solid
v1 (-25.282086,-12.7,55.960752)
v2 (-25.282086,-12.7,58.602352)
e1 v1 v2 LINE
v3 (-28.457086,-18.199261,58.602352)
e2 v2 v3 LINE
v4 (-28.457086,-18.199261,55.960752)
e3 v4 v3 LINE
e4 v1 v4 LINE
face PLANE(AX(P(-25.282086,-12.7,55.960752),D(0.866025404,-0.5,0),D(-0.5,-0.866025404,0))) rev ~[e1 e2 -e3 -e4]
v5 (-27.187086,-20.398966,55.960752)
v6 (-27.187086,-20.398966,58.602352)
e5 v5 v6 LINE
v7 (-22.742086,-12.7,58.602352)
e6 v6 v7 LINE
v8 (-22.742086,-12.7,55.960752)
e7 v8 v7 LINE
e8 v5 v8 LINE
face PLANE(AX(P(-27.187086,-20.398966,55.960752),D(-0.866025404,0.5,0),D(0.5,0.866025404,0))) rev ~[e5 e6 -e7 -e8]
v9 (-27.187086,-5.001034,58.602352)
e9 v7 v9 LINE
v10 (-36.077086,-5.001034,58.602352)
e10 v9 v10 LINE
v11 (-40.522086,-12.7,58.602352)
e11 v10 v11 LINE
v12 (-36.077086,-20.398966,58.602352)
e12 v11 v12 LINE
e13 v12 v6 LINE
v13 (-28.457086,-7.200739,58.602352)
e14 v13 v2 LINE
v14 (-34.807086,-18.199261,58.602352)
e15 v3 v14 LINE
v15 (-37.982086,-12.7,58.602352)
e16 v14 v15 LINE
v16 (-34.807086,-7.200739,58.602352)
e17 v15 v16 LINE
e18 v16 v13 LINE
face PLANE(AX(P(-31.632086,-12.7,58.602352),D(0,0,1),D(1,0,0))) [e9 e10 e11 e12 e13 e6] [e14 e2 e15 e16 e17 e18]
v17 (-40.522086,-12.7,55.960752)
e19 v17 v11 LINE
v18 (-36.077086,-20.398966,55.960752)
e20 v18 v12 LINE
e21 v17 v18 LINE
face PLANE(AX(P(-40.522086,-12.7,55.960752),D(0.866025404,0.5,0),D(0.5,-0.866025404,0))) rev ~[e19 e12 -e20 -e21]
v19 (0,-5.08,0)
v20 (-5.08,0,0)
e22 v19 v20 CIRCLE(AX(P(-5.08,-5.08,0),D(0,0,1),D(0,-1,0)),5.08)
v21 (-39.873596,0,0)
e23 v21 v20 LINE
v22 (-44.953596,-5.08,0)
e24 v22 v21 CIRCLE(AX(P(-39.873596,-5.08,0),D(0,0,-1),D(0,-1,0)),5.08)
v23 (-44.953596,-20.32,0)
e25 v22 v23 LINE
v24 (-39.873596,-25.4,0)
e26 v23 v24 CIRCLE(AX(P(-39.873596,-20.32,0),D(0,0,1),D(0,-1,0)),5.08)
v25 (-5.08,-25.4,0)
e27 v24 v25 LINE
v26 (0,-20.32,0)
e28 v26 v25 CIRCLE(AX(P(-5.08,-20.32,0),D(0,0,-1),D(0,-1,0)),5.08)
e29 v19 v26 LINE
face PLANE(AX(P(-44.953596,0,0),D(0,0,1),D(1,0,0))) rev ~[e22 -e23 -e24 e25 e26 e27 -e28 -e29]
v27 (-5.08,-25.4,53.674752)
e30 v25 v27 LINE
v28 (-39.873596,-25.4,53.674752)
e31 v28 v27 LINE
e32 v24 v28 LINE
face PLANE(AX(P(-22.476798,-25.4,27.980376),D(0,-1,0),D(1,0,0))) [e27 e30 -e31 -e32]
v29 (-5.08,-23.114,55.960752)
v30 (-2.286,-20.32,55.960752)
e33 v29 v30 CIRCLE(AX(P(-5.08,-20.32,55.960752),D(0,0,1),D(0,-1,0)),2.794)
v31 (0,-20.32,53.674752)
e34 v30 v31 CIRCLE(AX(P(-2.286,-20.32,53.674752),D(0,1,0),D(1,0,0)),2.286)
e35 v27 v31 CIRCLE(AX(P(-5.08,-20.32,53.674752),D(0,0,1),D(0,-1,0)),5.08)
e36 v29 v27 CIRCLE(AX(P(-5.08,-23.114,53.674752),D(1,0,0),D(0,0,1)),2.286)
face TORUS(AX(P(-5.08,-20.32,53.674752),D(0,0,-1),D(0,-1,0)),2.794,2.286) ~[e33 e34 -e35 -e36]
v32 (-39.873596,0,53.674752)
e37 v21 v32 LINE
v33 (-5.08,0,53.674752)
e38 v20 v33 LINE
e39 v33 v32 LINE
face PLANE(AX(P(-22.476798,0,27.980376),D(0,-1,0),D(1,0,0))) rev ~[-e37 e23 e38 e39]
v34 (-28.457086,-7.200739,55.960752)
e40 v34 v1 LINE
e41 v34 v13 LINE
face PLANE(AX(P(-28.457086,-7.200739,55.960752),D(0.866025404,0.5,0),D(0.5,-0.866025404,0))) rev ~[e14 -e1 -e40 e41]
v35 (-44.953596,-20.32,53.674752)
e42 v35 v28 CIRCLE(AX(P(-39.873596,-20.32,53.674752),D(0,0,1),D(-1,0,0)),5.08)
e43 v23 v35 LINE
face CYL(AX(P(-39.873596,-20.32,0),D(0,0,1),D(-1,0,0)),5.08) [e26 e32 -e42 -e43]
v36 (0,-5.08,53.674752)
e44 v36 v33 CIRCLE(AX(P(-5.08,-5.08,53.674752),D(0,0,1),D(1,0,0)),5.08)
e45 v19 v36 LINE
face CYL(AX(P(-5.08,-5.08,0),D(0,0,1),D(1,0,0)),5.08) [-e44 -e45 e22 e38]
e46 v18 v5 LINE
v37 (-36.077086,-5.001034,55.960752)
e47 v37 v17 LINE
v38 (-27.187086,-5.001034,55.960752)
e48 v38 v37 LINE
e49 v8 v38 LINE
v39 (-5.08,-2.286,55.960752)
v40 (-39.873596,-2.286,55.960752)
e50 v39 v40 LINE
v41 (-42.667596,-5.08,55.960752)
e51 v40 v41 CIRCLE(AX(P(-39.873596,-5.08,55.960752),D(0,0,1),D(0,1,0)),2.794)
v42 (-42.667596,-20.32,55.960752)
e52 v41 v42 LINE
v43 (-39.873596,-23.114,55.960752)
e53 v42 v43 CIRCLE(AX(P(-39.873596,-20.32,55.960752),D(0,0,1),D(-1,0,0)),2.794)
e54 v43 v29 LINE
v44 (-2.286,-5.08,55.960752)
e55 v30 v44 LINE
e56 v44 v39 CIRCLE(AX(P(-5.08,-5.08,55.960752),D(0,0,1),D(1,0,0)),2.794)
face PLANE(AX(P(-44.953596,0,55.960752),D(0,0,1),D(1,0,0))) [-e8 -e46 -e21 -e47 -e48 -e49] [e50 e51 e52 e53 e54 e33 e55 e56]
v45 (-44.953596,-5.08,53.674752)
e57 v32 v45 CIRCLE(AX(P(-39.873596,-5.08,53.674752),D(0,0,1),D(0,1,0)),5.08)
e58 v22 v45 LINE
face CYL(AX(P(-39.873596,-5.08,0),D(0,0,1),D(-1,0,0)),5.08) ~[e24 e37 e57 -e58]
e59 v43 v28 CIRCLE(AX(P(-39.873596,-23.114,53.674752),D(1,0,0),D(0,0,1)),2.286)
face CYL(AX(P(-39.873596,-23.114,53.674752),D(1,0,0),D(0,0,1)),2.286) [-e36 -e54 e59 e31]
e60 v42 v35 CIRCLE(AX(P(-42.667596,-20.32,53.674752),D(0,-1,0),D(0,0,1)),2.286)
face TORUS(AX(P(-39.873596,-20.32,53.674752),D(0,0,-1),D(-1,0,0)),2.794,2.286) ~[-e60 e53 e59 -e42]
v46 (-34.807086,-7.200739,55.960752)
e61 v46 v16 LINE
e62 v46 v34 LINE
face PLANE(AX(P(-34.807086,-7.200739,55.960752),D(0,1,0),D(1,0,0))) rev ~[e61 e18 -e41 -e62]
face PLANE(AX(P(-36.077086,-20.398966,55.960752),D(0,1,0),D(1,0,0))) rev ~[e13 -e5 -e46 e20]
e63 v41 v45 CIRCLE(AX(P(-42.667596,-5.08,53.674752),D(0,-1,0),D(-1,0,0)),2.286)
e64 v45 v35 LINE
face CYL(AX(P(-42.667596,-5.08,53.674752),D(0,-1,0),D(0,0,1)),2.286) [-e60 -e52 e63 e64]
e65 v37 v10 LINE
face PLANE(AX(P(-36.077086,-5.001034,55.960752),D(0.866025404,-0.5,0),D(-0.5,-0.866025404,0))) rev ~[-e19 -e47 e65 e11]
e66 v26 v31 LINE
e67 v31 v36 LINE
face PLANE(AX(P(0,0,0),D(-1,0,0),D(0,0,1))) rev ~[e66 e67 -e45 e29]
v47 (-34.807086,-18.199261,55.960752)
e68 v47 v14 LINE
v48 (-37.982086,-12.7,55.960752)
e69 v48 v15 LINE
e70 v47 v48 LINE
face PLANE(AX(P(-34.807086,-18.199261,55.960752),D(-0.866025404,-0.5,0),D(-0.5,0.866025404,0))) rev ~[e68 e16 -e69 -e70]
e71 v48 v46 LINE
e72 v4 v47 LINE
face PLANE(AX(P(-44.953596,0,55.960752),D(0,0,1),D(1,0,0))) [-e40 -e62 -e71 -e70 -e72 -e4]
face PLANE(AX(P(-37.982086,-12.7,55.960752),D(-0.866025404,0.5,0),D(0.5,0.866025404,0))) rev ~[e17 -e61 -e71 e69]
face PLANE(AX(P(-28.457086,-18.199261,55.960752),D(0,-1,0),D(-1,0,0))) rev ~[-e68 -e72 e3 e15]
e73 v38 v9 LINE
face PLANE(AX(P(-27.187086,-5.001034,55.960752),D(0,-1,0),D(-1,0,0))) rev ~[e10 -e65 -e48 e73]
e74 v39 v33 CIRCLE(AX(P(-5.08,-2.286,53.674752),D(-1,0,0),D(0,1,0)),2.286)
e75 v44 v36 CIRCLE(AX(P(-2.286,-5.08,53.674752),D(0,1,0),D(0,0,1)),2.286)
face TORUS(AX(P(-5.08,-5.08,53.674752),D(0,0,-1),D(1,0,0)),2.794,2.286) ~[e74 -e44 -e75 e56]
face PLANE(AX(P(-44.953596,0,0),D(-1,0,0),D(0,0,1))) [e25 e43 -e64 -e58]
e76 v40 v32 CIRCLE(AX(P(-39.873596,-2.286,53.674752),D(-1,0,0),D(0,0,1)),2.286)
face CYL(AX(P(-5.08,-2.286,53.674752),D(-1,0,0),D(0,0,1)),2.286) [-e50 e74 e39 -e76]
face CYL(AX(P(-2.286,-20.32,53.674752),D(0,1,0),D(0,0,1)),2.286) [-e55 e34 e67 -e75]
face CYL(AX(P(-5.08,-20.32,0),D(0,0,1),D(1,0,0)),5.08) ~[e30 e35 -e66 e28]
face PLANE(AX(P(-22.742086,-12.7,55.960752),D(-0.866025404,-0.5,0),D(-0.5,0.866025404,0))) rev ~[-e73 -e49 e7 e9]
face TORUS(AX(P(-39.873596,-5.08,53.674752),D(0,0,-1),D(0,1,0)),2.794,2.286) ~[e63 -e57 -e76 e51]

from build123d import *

# Parameters (mm, degrees)
F0_W     = 44.9535958469
F0_H     = 55.96075207
F1_DEPTH = 25.4
F2_R     = 5.08
F7_DEPTH = 2.6416
F8_R     = 2.286


# Not quite as in the source:
# - the program builds the solid bodies; features that only make, move or delete a surface that nothing else refers to are left out


with BuildPart() as f1:
    # F0 (on Front) → F1 (new body)
    with BuildSketch(Plane.XZ):
        with Locations((-22.4767979234, 27.980376035)):
            Rectangle(F0_W, F0_H)
    extrude(amount=F1_DEPTH)

    # F2
    f2_edges = [f1.edges().sort_by_distance(p)[0] for p in [
        (-44.953596, -25.4, 27.980376),
        (-44.953596, 0, 27.980376),
        (0, -25.4, 27.980376),
        (0, 0, 27.980376),
    ]]
    fillet(f2_edges, radius=F2_R)

    # F6 (on face) → F7 (join)
    with BuildSketch(Plane.XY.offset(55.96075207)):
        Polygon((-36.077086072, -5.0010341604), (-40.522086072, -12.7), (-36.077086072, -20.3989658396), (-27.187086072, -20.3989658396), (-22.742086072, -12.7), (-27.187086072, -5.0010341604), align=None)
        Polygon((-34.807086072, -18.199261314), (-37.982086072, -12.7), (-34.807086072, -7.200738686), (-28.457086072, -7.200738686), (-25.282086072, -12.7), (-28.457086072, -18.199261314), align=None, mode=Mode.SUBTRACT)
    extrude(amount=F7_DEPTH)

    # F8
    f8_edges = [f1.edges().sort_by_distance(p)[0] for p in [
        (-22.476798, -25.4, 55.960752),
    ]]
    fillet(f8_edges, radius=F8_R)


solid = f1.part
